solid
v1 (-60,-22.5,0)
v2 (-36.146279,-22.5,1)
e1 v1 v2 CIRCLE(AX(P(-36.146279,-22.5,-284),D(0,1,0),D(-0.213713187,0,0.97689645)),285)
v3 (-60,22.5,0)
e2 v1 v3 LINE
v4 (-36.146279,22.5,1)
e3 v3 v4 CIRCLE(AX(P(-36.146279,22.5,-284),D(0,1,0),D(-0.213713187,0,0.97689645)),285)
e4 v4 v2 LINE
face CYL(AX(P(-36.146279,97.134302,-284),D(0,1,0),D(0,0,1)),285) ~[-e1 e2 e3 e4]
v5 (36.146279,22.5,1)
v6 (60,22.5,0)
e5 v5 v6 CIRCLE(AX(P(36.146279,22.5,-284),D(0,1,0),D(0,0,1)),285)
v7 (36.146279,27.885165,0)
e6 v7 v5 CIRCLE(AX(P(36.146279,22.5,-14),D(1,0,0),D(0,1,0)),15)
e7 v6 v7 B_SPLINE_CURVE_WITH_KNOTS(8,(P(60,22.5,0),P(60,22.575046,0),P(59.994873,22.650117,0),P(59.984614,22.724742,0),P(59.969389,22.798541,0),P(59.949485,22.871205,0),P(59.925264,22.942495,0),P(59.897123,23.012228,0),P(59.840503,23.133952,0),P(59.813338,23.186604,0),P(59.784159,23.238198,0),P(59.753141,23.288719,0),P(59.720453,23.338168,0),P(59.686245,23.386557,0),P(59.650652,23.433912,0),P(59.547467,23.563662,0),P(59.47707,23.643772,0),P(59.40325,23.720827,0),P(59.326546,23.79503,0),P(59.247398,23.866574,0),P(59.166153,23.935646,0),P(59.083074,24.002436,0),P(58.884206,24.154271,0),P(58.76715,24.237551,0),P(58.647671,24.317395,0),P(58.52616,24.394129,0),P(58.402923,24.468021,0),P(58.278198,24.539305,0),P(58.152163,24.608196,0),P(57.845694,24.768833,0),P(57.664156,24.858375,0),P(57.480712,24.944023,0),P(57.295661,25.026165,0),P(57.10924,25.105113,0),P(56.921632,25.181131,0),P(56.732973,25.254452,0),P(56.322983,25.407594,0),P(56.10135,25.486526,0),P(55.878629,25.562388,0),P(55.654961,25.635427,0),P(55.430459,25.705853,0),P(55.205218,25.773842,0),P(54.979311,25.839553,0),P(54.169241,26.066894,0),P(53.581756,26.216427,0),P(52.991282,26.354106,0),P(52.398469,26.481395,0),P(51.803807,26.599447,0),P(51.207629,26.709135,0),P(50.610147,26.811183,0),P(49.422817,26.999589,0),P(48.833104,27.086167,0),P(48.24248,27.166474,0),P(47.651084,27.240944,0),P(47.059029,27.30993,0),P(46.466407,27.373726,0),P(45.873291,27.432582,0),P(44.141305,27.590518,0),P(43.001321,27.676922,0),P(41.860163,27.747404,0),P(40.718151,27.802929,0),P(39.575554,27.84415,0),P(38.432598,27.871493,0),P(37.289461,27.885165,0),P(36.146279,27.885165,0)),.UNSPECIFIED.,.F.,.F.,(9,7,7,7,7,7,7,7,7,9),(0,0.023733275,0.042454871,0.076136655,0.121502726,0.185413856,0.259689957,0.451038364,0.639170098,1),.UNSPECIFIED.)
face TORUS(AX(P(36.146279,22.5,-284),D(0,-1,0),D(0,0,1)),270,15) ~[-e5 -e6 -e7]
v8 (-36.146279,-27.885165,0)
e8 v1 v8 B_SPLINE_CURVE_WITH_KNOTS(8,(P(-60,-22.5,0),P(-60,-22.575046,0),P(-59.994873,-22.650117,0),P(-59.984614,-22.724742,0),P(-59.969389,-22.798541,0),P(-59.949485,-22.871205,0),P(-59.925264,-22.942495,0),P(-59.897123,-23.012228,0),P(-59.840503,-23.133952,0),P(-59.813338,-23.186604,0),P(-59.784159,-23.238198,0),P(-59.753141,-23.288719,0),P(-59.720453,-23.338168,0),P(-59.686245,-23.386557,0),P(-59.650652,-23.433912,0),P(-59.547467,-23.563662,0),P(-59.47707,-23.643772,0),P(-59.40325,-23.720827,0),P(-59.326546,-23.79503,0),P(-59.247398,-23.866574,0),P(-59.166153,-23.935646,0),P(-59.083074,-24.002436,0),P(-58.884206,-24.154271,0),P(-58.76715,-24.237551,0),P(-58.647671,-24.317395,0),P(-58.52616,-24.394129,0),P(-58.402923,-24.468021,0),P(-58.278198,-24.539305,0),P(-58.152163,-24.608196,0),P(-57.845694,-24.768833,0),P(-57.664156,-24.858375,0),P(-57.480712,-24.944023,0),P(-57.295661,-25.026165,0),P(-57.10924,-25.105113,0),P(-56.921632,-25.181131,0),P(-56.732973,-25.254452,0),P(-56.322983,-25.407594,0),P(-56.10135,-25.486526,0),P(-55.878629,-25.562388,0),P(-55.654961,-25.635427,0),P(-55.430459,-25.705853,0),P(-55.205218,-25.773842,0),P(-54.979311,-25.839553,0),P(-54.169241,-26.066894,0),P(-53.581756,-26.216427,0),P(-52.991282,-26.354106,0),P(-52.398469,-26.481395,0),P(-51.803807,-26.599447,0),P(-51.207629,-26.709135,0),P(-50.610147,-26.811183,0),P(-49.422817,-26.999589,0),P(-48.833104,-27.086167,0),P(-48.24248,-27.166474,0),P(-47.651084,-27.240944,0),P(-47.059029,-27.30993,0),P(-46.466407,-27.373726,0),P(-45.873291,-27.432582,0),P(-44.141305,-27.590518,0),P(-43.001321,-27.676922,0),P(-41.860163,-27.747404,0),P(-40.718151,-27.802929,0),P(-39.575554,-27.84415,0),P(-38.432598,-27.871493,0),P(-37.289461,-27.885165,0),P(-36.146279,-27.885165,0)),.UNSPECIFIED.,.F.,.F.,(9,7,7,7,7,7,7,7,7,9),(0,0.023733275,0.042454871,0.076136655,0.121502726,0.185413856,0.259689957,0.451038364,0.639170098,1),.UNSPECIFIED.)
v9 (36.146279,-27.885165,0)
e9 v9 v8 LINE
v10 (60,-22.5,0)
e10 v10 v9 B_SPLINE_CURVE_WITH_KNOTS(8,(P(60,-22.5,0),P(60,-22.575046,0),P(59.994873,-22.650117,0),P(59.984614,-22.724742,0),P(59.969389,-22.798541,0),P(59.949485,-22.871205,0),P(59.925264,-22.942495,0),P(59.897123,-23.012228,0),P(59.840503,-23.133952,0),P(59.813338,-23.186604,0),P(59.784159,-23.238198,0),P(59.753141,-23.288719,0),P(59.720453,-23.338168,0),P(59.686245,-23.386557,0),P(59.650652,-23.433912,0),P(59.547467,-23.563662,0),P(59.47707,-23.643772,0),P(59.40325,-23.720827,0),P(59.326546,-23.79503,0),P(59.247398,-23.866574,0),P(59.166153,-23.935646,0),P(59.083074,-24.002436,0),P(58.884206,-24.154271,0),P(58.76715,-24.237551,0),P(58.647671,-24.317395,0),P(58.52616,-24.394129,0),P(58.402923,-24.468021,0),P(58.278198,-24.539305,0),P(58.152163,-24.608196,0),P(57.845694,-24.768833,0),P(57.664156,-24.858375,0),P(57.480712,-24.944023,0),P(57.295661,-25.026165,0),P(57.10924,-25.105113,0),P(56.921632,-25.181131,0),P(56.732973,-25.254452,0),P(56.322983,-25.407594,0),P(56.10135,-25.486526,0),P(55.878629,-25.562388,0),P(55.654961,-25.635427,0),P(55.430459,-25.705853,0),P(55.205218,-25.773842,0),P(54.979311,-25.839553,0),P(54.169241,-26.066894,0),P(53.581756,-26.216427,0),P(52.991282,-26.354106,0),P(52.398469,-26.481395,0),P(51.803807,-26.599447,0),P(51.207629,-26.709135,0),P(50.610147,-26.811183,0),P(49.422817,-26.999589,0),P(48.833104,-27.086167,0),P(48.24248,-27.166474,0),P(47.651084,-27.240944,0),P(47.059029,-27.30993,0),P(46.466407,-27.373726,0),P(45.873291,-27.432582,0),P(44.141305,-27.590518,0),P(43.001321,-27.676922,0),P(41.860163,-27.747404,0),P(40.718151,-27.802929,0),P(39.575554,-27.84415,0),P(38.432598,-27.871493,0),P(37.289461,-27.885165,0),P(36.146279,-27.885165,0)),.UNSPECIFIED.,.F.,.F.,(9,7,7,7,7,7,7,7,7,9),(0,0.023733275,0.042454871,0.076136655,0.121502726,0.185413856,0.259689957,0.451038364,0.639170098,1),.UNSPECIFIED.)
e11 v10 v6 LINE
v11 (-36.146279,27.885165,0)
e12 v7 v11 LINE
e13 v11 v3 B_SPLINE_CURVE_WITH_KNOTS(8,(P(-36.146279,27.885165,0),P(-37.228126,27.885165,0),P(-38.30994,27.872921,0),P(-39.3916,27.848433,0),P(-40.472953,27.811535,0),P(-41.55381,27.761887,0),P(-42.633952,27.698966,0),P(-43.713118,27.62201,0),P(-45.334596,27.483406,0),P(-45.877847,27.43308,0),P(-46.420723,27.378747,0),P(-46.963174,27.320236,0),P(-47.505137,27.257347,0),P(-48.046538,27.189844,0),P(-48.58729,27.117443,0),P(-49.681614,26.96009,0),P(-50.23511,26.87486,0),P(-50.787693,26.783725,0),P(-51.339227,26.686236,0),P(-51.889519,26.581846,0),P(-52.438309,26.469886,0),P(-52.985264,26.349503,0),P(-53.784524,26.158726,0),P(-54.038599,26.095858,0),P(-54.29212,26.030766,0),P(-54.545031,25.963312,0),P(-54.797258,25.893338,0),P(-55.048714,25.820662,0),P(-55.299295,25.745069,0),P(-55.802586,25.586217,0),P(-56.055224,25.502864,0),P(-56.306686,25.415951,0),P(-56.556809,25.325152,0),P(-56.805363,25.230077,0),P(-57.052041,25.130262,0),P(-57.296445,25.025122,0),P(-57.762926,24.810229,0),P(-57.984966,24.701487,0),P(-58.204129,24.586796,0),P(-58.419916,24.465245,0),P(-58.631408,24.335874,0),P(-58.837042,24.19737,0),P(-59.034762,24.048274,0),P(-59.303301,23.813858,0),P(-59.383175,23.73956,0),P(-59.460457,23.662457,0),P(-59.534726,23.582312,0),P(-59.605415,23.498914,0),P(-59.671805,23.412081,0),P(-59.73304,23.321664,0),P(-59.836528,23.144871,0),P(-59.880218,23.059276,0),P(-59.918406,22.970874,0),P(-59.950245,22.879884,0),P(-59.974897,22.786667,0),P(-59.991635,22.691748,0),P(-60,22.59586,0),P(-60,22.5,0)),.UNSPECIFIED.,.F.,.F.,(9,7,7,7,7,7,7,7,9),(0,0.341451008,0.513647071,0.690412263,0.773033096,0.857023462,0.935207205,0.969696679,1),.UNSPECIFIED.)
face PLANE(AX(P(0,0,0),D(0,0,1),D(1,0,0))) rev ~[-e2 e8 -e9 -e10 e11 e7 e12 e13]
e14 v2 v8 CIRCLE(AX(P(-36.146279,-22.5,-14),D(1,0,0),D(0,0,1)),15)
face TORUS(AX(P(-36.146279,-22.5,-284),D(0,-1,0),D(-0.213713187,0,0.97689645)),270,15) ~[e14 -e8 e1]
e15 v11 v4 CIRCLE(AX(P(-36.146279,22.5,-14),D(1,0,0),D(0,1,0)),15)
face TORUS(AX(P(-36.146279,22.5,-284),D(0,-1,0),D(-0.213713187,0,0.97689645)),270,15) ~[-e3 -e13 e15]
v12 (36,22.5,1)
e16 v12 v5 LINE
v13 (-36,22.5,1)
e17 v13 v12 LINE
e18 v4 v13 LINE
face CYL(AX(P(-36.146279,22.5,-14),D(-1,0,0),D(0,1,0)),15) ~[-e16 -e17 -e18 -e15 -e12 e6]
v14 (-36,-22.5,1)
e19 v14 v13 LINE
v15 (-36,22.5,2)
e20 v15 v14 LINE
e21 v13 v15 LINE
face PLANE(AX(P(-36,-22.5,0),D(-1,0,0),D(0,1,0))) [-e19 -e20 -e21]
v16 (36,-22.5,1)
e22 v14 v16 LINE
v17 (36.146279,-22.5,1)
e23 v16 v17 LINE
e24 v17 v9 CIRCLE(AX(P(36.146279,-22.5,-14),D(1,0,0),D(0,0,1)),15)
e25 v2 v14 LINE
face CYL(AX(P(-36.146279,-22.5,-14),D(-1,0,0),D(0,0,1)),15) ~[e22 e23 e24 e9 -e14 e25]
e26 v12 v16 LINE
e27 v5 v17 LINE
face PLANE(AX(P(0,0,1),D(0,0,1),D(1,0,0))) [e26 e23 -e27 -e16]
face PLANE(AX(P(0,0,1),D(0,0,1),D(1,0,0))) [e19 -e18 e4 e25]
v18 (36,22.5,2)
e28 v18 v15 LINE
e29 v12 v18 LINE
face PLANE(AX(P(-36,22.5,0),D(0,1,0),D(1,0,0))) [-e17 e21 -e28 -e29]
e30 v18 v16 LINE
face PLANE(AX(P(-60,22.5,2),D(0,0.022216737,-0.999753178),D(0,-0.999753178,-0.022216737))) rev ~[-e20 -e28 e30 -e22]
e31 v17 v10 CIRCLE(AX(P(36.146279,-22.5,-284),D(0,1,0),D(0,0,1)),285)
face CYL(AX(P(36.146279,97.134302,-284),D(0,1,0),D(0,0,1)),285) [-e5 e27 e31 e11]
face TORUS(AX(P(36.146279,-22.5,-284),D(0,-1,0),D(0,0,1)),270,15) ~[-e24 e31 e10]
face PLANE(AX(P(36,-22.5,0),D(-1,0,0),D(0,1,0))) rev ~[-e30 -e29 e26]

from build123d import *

# Parameters (mm, degrees)
F0_W         = 120
F0_H         = 75
F1_DEPTH     = 1
F0_W_2       = 24
F0_H_2       = 45
F2_DEPTH     = 2
F3_DEPTH     = 2
F4_DEPTH     = 2
F6_DEPTH     = 1000
F7_T1_DEPTH  = 194.2686044191
F8_T1_DEPTH  = 194.2686044191
F9_T1_DEPTH  = 72.2925582324
F9_T4_ANGLE  = 12.3400437426
F9_T6_ANGLE  = 12.3400437426
F10_T1_DEPTH = 72.2925582324
F10_T4_ANGLE = 12.3400437426
F10_T6_ANGLE = 12.3400437426


# Not quite as in the source:
# - a fillet or chamfer that OpenCascade refuses, or shapes differently, is made with other operations: its cross-section is extruded or revolved along the edge and cut away or added


with BuildPart() as f1:
    # F0 (on Top) → F1 (new body)
    with BuildSketch(Plane.XY):
        Rectangle(F0_W, F0_H)
        Polygon((-36, -22.5), (-36, 22.5), (-12, 22.5), (12, 22.5), (36, 22.5), (36, -22.5), (12, -22.5), (-12, -22.5), align=None, mode=Mode.SUBTRACT)
    extrude(amount=F1_DEPTH)

    # F0 (on Top) → F2 (join)
    with BuildSketch(Plane.XY):
        with Locations((-24, 0)):
            Rectangle(F0_W_2, F0_H_2)
    extrude(amount=F2_DEPTH)

    # F0 (on Top) → F3 (join)
    with BuildSketch(Plane.XY):
        Rectangle(F0_W_2, F0_H_2)
    extrude(amount=F3_DEPTH)

    # F0 (on Top) → F4 (join)
    with BuildSketch(Plane.XY):
        with Locations((24, 0)):
            Rectangle(F0_W_2, F0_H_2)
    extrude(amount=F4_DEPTH)

    # F5 (on face) → F6 (cut)
    with BuildSketch(Plane(origin=(-60, 0, 0), x_dir=(0, -1, 0), z_dir=(-1, 0, 0))):
        Polygon((22.5, 2), (-22.5, 2), (22.5, 1), align=None)
    extrude(amount=-F6_DEPTH, mode=Mode.SUBTRACT)

    # F7: fillet of radius 285 on 1 edges, made by hand

    # F7_s2 → F7_t1 (cut)
    with BuildSketch(Plane.XZ.offset(-97.1343022095)):
        with BuildLine():
            ThreePointArc((-36.1462791162, 1), (-48.0836155025, 0.7498902546), (-60, 0))
            Line((-60, 0), (-60, 1))
            Line((-60, 1), (-36.1462791162, 1))
        make_face()
    extrude(amount=F7_T1_DEPTH, mode=Mode.SUBTRACT)

    # F8: fillet of radius 285 on 1 edges, made by hand

    # F8_s2 → F8_t1 (cut)
    with BuildSketch(Plane.XZ.offset(-97.1343022095)):
        with BuildLine():
            ThreePointArc((36.1462791162, 1), (48.0836155025, 0.7498902546), (60, 0))
            Line((60, 0), (60, 1))
            Line((60, 1), (36.1462791162, 1))
        make_face()
    extrude(amount=F8_T1_DEPTH, mode=Mode.SUBTRACT)

    # F9: fillet of radius 15 on 1 edges, made by hand

    # F9_s2 → F9_t1 (cut)
    with BuildSketch(Plane.YZ.offset(-36.1462791162)):
        with BuildLine():
            ThreePointArc((-22.5, 1), (-33.1066017178, -3.3933982822), (-37.5, -14))
            Line((-37.5, -14), (-37.5, 1))
            Line((-37.5, 1), (-22.5, 1))
        make_face()
    extrude(amount=F9_T1_DEPTH, mode=Mode.SUBTRACT)

    # F9_s3 → F9_t4 (revolve, cut)
    with BuildSketch(Plane(origin=(-93.7876438564, 0, -20.5176876571), x_dir=(0, 1, 0), z_dir=(-0.9768964499, 0, -0.2137131866))):
        with BuildLine():
            ThreePointArc((-22.5, -15.2863447158), (-33.1066017178, -10.8929464336), (-37.5, -0.2863447158))
            Line((-37.5, -0.2863447158), (-37.5, -15.2863447158))
            Line((-37.5, -15.2863447158), (-22.5, -15.2863447158))
        make_face()
    revolve(axis=Axis((-36.1462791167, -37.5, -283.9999999893), (0, 1, 0)), revolution_arc=F9_T4_ANGLE, mode=Mode.SUBTRACT)

    # F9_s5 → F9_t6 (revolve, cut)
    with BuildSketch(Plane.YZ.offset(36.1462791167)):
        with BuildLine():
            ThreePointArc((-22.5, 1), (-33.1066017178, -3.3933982822), (-37.5, -14))
            Line((-37.5, -14), (-37.5, 1))
            Line((-37.5, 1), (-22.5, 1))
        make_face()
    revolve(axis=Axis((36.1462791167, -37.5, -283.9999999893), (0, 1, 0)), revolution_arc=F9_T6_ANGLE, mode=Mode.SUBTRACT)

    # F10: fillet of radius 15 on 1 edges, made by hand

    # F10_s2 → F10_t1 (cut)
    with BuildSketch(Plane.YZ.offset(-36.1462791162)):
        with BuildLine():
            ThreePointArc((37.5, -14), (33.1066017178, -3.3933982822), (22.5, 1))
            Line((22.5, 1), (37.5, 1))
            Line((37.5, 1), (37.5, -14))
        make_face()
    extrude(amount=F10_T1_DEPTH, mode=Mode.SUBTRACT)

    # F10_s3 → F10_t4 (revolve, cut)
    with BuildSketch(Plane.YZ.offset(36.1462791167)):
        with BuildLine():
            ThreePointArc((37.5, -14), (33.1066017178, -3.3933982822), (22.5, 1))
            Line((22.5, 1), (37.5, 1))
            Line((37.5, 1), (37.5, -14))
        make_face()
    revolve(axis=Axis((36.1462791167, 37.5, -283.9999999893), (0, 1, 0)), revolution_arc=F10_T4_ANGLE, mode=Mode.SUBTRACT)

    # F10_s5 → F10_t6 (revolve, cut)
    with BuildSketch(Plane(origin=(-93.7876438564, 0, -20.5176876571), x_dir=(0, 1, 0), z_dir=(-0.9768964499, 0, -0.2137131866))):
        with BuildLine():
            ThreePointArc((37.5, -0.2863447158), (33.1066017178, -10.8929464336), (22.5, -15.2863447158))
            Line((22.5, -15.2863447158), (37.5, -15.2863447158))
            Line((37.5, -15.2863447158), (37.5, -0.2863447158))
        make_face()
    revolve(axis=Axis((-36.1462791167, 37.5, -283.9999999893), (0, 1, 0)), revolution_arc=F10_T6_ANGLE, mode=Mode.SUBTRACT)


solid = f1.part
